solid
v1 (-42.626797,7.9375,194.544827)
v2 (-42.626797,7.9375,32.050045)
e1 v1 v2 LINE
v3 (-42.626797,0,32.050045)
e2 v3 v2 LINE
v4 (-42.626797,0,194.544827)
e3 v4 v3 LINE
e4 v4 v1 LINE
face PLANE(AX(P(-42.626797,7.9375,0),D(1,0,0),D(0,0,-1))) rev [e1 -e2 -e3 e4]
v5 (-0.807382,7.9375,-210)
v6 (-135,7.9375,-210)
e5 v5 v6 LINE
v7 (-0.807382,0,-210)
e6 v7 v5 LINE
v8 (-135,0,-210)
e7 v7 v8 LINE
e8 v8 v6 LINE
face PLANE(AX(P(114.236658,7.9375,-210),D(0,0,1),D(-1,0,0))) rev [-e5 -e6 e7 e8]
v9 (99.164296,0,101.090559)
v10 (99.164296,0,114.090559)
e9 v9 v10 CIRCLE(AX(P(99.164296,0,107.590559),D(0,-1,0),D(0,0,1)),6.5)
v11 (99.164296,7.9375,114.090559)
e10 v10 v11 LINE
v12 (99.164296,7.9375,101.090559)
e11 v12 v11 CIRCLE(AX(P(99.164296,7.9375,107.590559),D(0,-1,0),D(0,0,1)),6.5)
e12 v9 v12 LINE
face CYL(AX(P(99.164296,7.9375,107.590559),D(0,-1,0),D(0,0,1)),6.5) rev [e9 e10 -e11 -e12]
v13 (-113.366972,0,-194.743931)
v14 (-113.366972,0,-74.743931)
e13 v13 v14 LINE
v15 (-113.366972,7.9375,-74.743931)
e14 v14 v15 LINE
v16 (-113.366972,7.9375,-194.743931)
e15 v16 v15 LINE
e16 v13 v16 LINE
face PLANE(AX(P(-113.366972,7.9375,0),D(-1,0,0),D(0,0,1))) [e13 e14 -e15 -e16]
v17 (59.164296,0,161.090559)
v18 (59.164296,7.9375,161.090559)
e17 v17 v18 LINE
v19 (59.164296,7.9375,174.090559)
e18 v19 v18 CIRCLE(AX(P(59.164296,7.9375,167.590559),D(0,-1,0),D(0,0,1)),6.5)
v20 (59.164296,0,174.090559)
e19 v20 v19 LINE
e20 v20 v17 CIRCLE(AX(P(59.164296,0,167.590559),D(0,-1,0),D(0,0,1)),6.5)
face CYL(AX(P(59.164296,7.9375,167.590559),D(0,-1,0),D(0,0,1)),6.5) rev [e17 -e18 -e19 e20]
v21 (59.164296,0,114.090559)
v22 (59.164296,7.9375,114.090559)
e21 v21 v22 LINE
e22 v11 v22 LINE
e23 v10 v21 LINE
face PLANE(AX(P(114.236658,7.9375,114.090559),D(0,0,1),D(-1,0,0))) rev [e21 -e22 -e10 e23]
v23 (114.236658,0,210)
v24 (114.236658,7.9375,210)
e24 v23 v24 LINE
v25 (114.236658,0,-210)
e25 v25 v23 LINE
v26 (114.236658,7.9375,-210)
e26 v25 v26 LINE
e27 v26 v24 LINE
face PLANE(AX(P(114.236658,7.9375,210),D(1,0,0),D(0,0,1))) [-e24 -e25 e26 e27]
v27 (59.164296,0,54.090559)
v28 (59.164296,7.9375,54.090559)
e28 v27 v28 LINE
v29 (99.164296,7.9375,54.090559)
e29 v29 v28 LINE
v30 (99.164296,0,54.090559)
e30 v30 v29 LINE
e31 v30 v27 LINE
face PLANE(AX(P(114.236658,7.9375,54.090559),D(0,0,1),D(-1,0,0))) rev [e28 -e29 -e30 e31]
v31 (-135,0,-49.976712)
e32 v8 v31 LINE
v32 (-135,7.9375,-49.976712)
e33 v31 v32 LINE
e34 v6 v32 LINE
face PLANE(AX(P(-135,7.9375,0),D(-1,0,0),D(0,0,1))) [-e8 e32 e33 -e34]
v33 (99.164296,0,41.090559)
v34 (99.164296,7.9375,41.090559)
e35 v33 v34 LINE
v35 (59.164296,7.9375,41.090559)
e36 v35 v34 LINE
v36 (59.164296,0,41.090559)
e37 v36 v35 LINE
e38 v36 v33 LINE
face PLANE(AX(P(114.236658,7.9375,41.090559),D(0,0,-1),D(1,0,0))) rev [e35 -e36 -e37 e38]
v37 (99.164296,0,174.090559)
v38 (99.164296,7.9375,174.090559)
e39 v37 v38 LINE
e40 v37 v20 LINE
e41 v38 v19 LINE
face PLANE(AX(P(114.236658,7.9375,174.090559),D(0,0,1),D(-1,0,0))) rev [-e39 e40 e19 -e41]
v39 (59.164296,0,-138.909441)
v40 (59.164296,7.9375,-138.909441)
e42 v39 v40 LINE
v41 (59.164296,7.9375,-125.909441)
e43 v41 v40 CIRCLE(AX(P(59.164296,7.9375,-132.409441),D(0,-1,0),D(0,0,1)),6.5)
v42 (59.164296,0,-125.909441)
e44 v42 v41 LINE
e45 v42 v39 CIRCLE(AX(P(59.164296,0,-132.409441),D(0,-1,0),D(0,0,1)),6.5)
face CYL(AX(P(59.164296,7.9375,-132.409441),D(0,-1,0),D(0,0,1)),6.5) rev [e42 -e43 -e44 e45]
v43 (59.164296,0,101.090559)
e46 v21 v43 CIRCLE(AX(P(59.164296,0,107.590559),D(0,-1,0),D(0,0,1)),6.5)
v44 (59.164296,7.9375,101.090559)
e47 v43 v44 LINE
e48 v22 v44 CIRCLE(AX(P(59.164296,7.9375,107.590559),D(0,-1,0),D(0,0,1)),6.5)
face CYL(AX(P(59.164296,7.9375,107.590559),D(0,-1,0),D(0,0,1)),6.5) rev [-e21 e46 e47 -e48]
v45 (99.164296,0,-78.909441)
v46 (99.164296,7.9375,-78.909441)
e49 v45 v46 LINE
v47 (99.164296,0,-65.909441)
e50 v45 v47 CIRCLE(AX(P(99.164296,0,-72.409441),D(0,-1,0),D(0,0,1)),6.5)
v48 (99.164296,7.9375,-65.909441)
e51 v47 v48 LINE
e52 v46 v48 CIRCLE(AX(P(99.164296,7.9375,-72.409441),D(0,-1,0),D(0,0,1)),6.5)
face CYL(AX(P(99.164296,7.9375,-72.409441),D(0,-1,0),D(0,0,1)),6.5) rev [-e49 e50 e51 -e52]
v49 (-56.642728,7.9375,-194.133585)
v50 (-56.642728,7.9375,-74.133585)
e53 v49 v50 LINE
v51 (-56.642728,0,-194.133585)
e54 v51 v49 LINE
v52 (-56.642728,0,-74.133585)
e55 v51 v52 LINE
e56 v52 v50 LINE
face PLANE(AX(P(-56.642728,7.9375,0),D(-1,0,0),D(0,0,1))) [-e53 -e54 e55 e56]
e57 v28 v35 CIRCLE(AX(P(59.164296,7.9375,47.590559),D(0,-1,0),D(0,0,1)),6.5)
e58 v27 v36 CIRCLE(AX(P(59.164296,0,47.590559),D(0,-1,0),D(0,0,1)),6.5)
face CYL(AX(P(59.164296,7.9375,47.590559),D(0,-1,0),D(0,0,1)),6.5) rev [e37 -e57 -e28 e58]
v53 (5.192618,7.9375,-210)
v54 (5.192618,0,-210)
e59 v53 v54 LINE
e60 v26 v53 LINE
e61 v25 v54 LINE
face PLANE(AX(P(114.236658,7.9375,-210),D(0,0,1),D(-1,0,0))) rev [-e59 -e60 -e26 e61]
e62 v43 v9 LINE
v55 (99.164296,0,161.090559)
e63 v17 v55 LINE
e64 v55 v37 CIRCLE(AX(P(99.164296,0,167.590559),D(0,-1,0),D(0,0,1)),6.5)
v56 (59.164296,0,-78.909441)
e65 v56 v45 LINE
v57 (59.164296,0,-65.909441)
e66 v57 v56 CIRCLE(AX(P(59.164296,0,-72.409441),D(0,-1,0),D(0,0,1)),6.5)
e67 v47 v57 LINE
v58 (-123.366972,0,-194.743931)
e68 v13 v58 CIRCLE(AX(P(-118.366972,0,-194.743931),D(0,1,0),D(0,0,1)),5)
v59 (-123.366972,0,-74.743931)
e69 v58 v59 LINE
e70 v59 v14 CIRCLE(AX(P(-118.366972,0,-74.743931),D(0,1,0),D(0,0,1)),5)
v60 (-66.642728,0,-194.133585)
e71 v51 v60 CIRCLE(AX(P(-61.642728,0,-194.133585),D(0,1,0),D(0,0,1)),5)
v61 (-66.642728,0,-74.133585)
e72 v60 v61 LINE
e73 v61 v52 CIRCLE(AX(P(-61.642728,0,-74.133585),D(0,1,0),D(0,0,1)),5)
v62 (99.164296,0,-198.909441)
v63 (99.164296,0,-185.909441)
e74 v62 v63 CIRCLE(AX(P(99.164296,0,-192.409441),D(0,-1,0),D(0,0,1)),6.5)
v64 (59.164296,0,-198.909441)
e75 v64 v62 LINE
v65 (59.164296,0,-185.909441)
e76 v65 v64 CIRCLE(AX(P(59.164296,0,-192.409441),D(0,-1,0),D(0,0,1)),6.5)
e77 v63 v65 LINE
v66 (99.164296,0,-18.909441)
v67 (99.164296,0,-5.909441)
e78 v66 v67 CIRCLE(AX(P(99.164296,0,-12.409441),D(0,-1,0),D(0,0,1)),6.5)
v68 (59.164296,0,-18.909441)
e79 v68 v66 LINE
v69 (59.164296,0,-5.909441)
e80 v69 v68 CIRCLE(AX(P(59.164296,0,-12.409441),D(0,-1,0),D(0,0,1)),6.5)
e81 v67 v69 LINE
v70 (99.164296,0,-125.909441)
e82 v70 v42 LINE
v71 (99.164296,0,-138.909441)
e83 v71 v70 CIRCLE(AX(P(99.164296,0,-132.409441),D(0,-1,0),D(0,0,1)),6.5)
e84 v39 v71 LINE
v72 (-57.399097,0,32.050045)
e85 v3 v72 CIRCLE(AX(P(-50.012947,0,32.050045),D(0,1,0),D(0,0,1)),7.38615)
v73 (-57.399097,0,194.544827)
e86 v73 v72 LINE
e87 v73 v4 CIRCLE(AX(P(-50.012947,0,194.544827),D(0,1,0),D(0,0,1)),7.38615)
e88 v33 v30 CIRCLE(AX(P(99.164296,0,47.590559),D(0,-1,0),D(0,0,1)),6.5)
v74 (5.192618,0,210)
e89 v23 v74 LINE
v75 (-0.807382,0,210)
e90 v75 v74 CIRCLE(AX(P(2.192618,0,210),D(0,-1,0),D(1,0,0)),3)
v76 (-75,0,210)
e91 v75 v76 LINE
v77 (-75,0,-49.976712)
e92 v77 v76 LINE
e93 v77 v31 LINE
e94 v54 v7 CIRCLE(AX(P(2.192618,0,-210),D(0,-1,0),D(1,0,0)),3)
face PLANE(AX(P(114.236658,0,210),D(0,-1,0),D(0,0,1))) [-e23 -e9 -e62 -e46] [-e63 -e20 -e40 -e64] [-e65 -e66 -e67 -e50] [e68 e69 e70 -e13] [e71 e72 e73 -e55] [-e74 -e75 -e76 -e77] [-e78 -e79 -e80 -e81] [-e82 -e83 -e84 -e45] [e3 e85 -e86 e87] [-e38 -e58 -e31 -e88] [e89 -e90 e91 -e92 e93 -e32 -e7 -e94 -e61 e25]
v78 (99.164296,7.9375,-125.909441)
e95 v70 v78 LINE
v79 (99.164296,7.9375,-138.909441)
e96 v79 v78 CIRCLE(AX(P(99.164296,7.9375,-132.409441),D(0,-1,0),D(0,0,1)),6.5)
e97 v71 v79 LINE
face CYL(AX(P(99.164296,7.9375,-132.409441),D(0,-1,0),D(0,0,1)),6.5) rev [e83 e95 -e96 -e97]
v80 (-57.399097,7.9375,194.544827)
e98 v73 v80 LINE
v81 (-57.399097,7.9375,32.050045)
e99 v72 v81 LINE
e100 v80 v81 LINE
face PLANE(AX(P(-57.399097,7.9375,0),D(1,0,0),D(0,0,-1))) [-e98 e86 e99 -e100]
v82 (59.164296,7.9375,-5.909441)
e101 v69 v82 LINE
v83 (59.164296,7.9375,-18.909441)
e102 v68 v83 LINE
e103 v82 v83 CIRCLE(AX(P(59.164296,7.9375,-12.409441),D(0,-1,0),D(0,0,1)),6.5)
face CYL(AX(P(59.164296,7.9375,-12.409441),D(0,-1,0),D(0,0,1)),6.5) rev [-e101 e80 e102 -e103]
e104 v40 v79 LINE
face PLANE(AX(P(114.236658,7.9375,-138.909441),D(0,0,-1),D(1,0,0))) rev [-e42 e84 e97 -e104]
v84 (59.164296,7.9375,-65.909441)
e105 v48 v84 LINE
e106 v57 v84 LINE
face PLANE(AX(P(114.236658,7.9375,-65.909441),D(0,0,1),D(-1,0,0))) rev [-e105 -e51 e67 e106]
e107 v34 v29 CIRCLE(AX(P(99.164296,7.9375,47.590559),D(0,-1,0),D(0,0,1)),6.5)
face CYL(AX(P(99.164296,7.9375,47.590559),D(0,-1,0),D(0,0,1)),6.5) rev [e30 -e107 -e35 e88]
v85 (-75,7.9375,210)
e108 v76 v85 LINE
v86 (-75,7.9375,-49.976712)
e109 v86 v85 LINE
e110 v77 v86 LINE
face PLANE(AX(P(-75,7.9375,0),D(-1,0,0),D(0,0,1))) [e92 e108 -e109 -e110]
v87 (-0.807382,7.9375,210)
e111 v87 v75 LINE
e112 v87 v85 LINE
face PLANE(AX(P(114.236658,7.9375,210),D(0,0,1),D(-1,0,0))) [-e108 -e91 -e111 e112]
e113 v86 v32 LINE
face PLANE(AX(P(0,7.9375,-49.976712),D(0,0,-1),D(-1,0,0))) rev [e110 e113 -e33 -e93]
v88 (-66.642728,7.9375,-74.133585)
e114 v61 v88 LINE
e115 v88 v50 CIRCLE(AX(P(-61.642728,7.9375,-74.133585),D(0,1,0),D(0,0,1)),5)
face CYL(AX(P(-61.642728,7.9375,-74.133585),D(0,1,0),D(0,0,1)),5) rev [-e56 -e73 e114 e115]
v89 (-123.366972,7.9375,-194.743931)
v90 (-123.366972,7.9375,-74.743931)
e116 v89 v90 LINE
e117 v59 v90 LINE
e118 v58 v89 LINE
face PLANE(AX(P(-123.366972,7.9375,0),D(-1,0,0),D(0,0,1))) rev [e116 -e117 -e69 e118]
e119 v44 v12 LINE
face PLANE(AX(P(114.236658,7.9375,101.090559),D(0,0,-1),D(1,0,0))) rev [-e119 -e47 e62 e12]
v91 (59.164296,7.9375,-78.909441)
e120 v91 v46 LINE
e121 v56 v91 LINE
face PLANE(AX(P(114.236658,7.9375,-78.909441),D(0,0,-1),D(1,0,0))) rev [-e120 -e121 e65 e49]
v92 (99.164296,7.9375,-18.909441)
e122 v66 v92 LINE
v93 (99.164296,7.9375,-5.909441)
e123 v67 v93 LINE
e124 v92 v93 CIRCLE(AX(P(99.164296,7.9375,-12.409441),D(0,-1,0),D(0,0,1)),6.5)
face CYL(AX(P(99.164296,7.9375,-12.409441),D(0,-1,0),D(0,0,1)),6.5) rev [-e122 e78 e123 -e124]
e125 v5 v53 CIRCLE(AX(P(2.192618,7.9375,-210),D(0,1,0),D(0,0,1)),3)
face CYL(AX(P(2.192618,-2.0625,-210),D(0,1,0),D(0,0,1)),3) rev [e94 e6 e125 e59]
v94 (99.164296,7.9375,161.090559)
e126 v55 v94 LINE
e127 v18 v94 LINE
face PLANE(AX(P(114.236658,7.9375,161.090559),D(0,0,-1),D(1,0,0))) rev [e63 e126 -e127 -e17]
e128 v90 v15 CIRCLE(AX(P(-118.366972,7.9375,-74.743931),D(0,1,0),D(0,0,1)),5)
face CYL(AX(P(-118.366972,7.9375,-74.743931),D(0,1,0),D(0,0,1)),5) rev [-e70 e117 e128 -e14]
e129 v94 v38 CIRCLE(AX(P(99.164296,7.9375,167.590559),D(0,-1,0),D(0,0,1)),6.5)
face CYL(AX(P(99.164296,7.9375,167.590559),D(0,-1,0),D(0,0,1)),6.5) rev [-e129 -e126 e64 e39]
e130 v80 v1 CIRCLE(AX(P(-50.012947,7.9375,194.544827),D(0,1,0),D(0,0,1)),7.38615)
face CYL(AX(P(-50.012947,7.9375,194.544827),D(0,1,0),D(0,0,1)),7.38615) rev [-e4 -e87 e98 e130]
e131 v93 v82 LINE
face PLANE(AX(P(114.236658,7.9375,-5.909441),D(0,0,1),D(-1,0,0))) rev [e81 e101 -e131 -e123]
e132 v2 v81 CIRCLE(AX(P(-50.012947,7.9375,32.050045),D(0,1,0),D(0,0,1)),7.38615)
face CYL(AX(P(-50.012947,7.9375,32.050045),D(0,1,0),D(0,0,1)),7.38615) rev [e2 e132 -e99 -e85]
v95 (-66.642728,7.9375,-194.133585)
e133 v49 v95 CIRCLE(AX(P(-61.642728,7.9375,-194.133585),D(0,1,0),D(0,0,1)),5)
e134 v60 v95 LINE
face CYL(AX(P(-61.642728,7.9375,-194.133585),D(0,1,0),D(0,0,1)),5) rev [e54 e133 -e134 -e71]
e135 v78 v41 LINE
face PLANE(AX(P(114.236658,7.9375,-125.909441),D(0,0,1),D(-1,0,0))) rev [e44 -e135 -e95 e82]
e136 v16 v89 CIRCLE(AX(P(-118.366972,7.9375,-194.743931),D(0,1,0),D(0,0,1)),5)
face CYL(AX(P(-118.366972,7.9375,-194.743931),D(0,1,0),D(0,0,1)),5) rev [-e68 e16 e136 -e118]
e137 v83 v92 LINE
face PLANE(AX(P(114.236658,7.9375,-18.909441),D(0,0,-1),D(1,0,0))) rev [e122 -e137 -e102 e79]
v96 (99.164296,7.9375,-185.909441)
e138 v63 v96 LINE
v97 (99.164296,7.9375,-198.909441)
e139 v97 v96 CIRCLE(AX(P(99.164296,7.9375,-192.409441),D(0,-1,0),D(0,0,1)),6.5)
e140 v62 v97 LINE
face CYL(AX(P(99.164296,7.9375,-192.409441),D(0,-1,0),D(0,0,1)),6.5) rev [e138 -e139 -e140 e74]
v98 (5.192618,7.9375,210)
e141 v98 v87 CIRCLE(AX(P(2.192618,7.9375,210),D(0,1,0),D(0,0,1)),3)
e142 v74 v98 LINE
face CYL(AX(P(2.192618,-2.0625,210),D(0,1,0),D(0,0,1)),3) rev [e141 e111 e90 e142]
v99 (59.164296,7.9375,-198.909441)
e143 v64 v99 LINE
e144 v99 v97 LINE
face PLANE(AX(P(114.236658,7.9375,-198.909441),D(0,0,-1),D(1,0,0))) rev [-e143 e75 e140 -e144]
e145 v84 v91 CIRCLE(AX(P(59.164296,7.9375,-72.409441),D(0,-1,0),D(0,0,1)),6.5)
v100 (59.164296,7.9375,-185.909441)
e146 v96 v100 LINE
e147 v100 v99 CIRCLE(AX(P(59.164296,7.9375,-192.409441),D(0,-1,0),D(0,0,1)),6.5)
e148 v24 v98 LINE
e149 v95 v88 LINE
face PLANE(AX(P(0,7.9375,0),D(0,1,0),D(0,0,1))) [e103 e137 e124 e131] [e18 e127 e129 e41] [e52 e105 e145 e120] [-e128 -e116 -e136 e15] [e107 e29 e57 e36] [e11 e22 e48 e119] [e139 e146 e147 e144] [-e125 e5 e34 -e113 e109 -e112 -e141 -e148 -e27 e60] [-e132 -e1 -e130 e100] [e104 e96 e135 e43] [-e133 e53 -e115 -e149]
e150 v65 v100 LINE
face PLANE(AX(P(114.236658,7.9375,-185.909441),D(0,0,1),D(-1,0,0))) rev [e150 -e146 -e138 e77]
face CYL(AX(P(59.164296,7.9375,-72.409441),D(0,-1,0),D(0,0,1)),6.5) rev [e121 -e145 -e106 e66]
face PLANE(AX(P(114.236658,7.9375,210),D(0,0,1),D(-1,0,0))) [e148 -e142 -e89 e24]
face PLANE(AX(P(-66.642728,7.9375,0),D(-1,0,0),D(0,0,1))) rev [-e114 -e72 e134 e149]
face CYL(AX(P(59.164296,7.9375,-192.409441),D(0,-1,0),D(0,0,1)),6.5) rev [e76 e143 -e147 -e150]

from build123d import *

# Parameters (mm, degrees)
CROQUIS1_W                = 60
CROQUIS1_H                = 160.023288417
SALIENTE_EXTRUIR1_DEPTH   = 7.9375
CROQUIS2_W                = 8.086078182
CROQUIS2_H                = 420
SALIENTE_EXTRUIR2_DEPTH   = 110
CORTAR_EXTRUIR1_DEPTH     = 10
CROQUIS4_W                = 184.389639933
CROQUIS4_H                = 520.028204804
CORTAR_EXTRUIR2_DEPTH     = 10
CONVERTIR_S_LIDO1_START   = -210
CONVERTIR_S_LIDO1_DEPTH   = 420
CONVERTIR_S_LIDO1_2_DEPTH = 420
CORTAR_EXTRUIR3_START     = -117.9375
CORTAR_EXTRUIR3_OUTLINE_W = 14.086078182
CORTAR_EXTRUIR3_OUTLINE_H = 420
CORTAR_EXTRUIR3_DEPTH     = 110
CORTAR_EXTRUIR3_START_2   = -7.9375
CORTAR_EXTRUIR3_2_DEPTH   = 7.9375
CORTAR_EXTRUIR3_3_DEPTH   = 7.9375


# Read off the part's stored shape, not the designer's step: Convertir-Sólido1, Cortar-Extruir3
with BuildPart() as part:
    # Croquis1 → Saliente-Extruir1 (new body)
    # profile 1 of 2: a face of its own
    with BuildSketch(Plane(origin=(0, 0, 0), x_dir=(1, 0, 0), z_dir=(0, 1, 0))):
        Polygon((75, 210), (-75, 210), (-75, 49.976711583), (-75, -210), (75, -210), align=None)
        with BuildLine():
            Line((-57.399097033, -162.050045053), (-57.399097033, -64.544827159))
            Line((-57.399097033, -64.544827159), (-57.399097033, -32.050045053))
            ThreePointArc((-57.399097033, -32.050045053), (-50.012947046, -24.663895066), (-42.626797059, -32.050045053))
            Line((-42.626797059, -32.050045053), (-42.626797059, -64.544827159))
            Line((-42.626797059, -64.544827159), (-42.626797059, -162.050045053))
            Line((-42.626797059, -162.050045053), (-42.626797059, -194.544827159))
            ThreePointArc((-42.626797059, -194.544827159), (-50.012947046, -201.930977146), (-57.399097033, -194.544827159))
            Line((-57.399097033, -194.544827159), (-57.399097033, -162.050045053))
        make_face(mode=Mode.SUBTRACT)
        with BuildLine():
            ThreePointArc((57.373202941, -194.544827159), (49.987052954, -201.930977146), (42.600902967, -194.544827159))
            Line((42.600902967, -194.544827159), (42.600902967, -162.050045053))
            ThreePointArc((42.600902967, -162.050045053), (49.987052954, -154.663895066), (57.373202941, -162.050045053))
            Line((57.373202941, -162.050045053), (57.373202941, -194.544827159))
        make_face(mode=Mode.SUBTRACT)
        with BuildLine():
            ThreePointArc((57.373202941, -64.544827159), (49.987052954, -71.930977146), (42.600902967, -64.544827159))
            Line((42.600902967, -64.544827159), (42.600902967, -32.050045053))
            ThreePointArc((42.600902967, -32.050045053), (49.987052954, -24.663895066), (57.373202941, -32.050045053))
            Line((57.373202941, -32.050045053), (57.373202941, -64.544827159))
        make_face(mode=Mode.SUBTRACT)
        with BuildLine():
            ThreePointArc((-66.642728039, 194.133584854), (-61.642728039, 199.133584854), (-56.642728039, 194.133584854))
            Line((-56.642728039, 194.133584854), (-56.642728039, 74.133584854))
            ThreePointArc((-56.642728039, 74.133584854), (-61.642728039, 69.133584854), (-66.642728039, 74.133584854))
            Line((-66.642728039, 74.133584854), (-66.642728039, 194.133584854))
        make_face(mode=Mode.SUBTRACT)
    # profile 2 of 2: a face of its own
    with BuildSketch(Plane(origin=(0, 0, 0), x_dir=(1, 0, 0), z_dir=(0, 1, 0))):
        with Locations((-105, 129.988355791)):
            Rectangle(CROQUIS1_W, CROQUIS1_H)
        with BuildLine():
            ThreePointArc((-123.366972213, 194.743931483), (-118.366972213, 199.743931483), (-113.366972213, 194.743931483))
            Line((-113.366972213, 194.743931483), (-113.366972213, 74.743931483))
            ThreePointArc((-113.366972213, 74.743931483), (-118.366972213, 69.743931483), (-123.366972213, 74.743931483))
            Line((-123.366972213, 74.743931483), (-123.366972213, 194.743931483))
        make_face(mode=Mode.SUBTRACT)
    extrude(amount=SALIENTE_EXTRUIR1_DEPTH)

    # Croquis2 → Saliente-Extruir2 (add)
    with BuildSketch(Plane.XZ):
        with Locations((4.043039091, 0)):
            Rectangle(CROQUIS2_W, CROQUIS2_H)
    extrude(amount=SALIENTE_EXTRUIR2_DEPTH)

    # Croquis3 → Cortar-Extruir1 (cut)
    with BuildSketch(Plane.ZY):
        with BuildLine():
            Line((-185.90944112, -54.927638628), (-185.90944112, -94.927638628))
            ThreePointArc((-185.90944112, -94.927638628), (-192.40944112, -101.427638628), (-198.90944112, -94.927638628))
            Line((-198.90944112, -94.927638628), (-198.90944112, -54.927638628))
            ThreePointArc((-198.90944112, -54.927638628), (-192.40944112, -48.427638628), (-185.90944112, -54.927638628))
        make_face()
        with BuildLine():
            Line((-125.90944112, -54.927638628), (-125.90944112, -94.927638628))
            ThreePointArc((-125.90944112, -94.927638628), (-132.40944112, -101.427638628), (-138.90944112, -94.927638628))
            Line((-138.90944112, -94.927638628), (-138.90944112, -54.927638628))
            ThreePointArc((-138.90944112, -54.927638628), (-132.40944112, -48.427638628), (-125.90944112, -54.927638628))
        make_face()
        with BuildLine():
            Line((-65.90944112, -54.927638628), (-65.90944112, -94.927638628))
            ThreePointArc((-65.90944112, -94.927638628), (-72.40944112, -101.427638628), (-78.90944112, -94.927638628))
            Line((-78.90944112, -94.927638628), (-78.90944112, -54.927638628))
            ThreePointArc((-78.90944112, -54.927638628), (-72.40944112, -48.427638628), (-65.90944112, -54.927638628))
        make_face()
        with BuildLine():
            Line((-5.90944112, -54.927638628), (-5.90944112, -94.927638628))
            ThreePointArc((-5.90944112, -94.927638628), (-12.40944112, -101.427638628), (-18.90944112, -94.927638628))
            Line((-18.90944112, -94.927638628), (-18.90944112, -54.927638628))
            ThreePointArc((-18.90944112, -54.927638628), (-12.40944112, -48.427638628), (-5.90944112, -54.927638628))
        make_face()
        with BuildLine():
            Line((54.09055888, -54.927638628), (54.09055888, -94.927638628))
            ThreePointArc((54.09055888, -94.927638628), (47.59055888, -101.427638628), (41.09055888, -94.927638628))
            Line((41.09055888, -94.927638628), (41.09055888, -54.927638628))
            ThreePointArc((41.09055888, -54.927638628), (47.59055888, -48.427638628), (54.09055888, -54.927638628))
        make_face()
        with BuildLine():
            Line((114.09055888, -54.927638628), (114.09055888, -94.927638628))
            ThreePointArc((114.09055888, -94.927638628), (107.59055888, -101.427638628), (101.09055888, -94.927638628))
            Line((101.09055888, -94.927638628), (101.09055888, -54.927638628))
            ThreePointArc((101.09055888, -54.927638628), (107.59055888, -48.427638628), (114.09055888, -54.927638628))
        make_face()
        with BuildLine():
            Line((174.09055888, -54.927638628), (174.09055888, -94.927638628))
            ThreePointArc((174.09055888, -94.927638628), (167.59055888, -101.427638628), (161.09055888, -94.927638628))
            Line((161.09055888, -94.927638628), (161.09055888, -54.927638628))
            ThreePointArc((161.09055888, -54.927638628), (167.59055888, -48.427638628), (174.09055888, -54.927638628))
        make_face()
    extrude(amount=-CORTAR_EXTRUIR1_DEPTH, mode=Mode.SUBTRACT)

    # Croquis4 → Cortar-Extruir2 (cut)
    with BuildSketch(Plane.XZ):
        with Locations((100.280898149, 50.014102402)):
            Rectangle(CROQUIS4_W, CROQUIS4_H)
    extrude(amount=-CORTAR_EXTRUIR2_DEPTH, mode=Mode.SUBTRACT)

    # Convertir-Sólido1 outline → Convertir-Sólido1 (cut)
    with BuildSketch(Plane.XY.offset(CONVERTIR_S_LIDO1_START)):
        with BuildLine():
            Line((8.086078182, 7.9375), (-4.851421818, 7.9375))
            ThreePointArc((-4.851421818, 7.9375), (4.296772164, 4.148193982), (8.086078182, -5))
            Line((8.086078182, -5), (8.086078182, 7.9375))
        make_face()
        with BuildLine():
            Line((0, -110), (0.148578182, -110))
            Line((0.148578182, -110), (0.148578182, -5))
            ThreePointArc((0.148578182, -5), (0.11129463, -4.390536748), (0, -3.790162679))
            Line((0, -3.790162679), (0, -110))
        make_face()
    extrude(amount=CONVERTIR_S_LIDO1_DEPTH, mode=Mode.SUBTRACT)

    # Convertir-S_lido1 2 outline → Convertir-S_lido1 2 (add)
    with BuildSketch(Plane.XY.offset(CONVERTIR_S_LIDO1_START)):
        with BuildLine():
            ThreePointArc((-4.851421818, 0), (-1.773206962, -1.059873948), (0, -3.790162679))
            Line((0, -3.790162679), (0, 0))
            Line((0, 0), (-4.851421818, 0))
        make_face()
    extrude(amount=CONVERTIR_S_LIDO1_2_DEPTH)

    # Cortar-Extruir3 outline → Cortar-Extruir3 (cut)
    with BuildSketch(Plane(origin=(0, 7.9375, 0), x_dir=(1, 0, 0), z_dir=(0, 1, 0)).offset(CORTAR_EXTRUIR3_START)):
        with Locations((1.043039091, 0)):
            Rectangle(CORTAR_EXTRUIR3_OUTLINE_W, CORTAR_EXTRUIR3_OUTLINE_H)
    extrude(amount=CORTAR_EXTRUIR3_DEPTH, mode=Mode.SUBTRACT)

    # Cortar-Extruir3 2 outline → Cortar-Extruir3 2 (cut)
    with BuildSketch(Plane(origin=(0, 7.9375, 0), x_dir=(1, 0, 0), z_dir=(0, 1, 0)).offset(CORTAR_EXTRUIR3_START_2)):
        with BuildLine():
            Line((5.19261796, 210), (-0.80738204, 210))
            ThreePointArc((-0.80738204, 210), (2.19261796, 207), (5.19261796, 210))
        make_face()
        with BuildLine():
            Line((-0.80738204, -210), (5.19261796, -210))
            ThreePointArc((5.19261796, -210), (2.19261796, -207), (-0.80738204, -210))
        make_face()
    extrude(amount=CORTAR_EXTRUIR3_2_DEPTH, mode=Mode.SUBTRACT)

    # Cortar-Extruir3 3 outline → Cortar-Extruir3 3 (add)
    with BuildSketch(Plane(origin=(0, 7.9375, 0), x_dir=(1, 0, 0), z_dir=(0, 1, 0)).offset(CORTAR_EXTRUIR3_START_2)):
        with BuildLine():
            ThreePointArc((5.19261796, 210), (2.19261796, 207), (-0.80738204, 210))
            Line((-0.80738204, 210), (-6, 210))
            Line((-6, 210), (-6, -210))
            Line((-6, -210), (-0.80738204, -210))
            ThreePointArc((-0.80738204, -210), (2.19261796, -207), (5.19261796, -210))
            Line((5.19261796, -210), (114.236657738, -210))
            Line((114.236657738, -210), (114.236657738, 210))
            Line((114.236657738, 210), (5.19261796, 210))
        make_face()
        with BuildLine():
            Line((59.164296366, 198.90944112), (99.164296366, 198.90944112))
            ThreePointArc((99.164296366, 198.90944112), (105.664296366, 192.40944112), (99.164296366, 185.90944112))
            Line((99.164296366, 185.90944112), (59.164296366, 185.90944112))
            ThreePointArc((59.164296366, 185.90944112), (52.664296366, 192.40944112), (59.164296366, 198.90944112))
        make_face(mode=Mode.SUBTRACT)
        with BuildLine():
            Line((59.164296366, 138.90944112), (99.164296366, 138.90944112))
            ThreePointArc((99.164296366, 138.90944112), (105.664296366, 132.40944112), (99.164296366, 125.90944112))
            Line((99.164296366, 125.90944112), (59.164296366, 125.90944112))
            ThreePointArc((59.164296366, 125.90944112), (52.664296366, 132.40944112), (59.164296366, 138.90944112))
        make_face(mode=Mode.SUBTRACT)
        with BuildLine():
            Line((59.164296366, 78.90944112), (99.164296366, 78.90944112))
            ThreePointArc((99.164296366, 78.90944112), (105.664296366, 72.40944112), (99.164296366, 65.90944112))
            Line((99.164296366, 65.90944112), (59.164296366, 65.90944112))
            ThreePointArc((59.164296366, 65.90944112), (52.664296366, 72.40944112), (59.164296366, 78.90944112))
        make_face(mode=Mode.SUBTRACT)
        with BuildLine():
            Line((59.164296366, 18.90944112), (99.164296366, 18.90944112))
            ThreePointArc((99.164296366, 18.90944112), (105.664296366, 12.40944112), (99.164296366, 5.90944112))
            Line((99.164296366, 5.90944112), (59.164296366, 5.90944112))
            ThreePointArc((59.164296366, 5.90944112), (52.664296366, 12.40944112), (59.164296366, 18.90944112))
        make_face(mode=Mode.SUBTRACT)
        with BuildLine():
            Line((59.164296366, -41.09055888), (99.164296366, -41.09055888))
            ThreePointArc((99.164296366, -41.09055888), (105.664296366, -47.59055888), (99.164296366, -54.09055888))
            Line((99.164296366, -54.09055888), (59.164296366, -54.09055888))
            ThreePointArc((59.164296366, -54.09055888), (52.664296366, -47.59055888), (59.164296366, -41.09055888))
        make_face(mode=Mode.SUBTRACT)
        with BuildLine():
            Line((59.164296366, -101.09055888), (99.164296366, -101.09055888))
            ThreePointArc((99.164296366, -101.09055888), (105.664296366, -107.59055888), (99.164296366, -114.09055888))
            Line((99.164296366, -114.09055888), (59.164296366, -114.09055888))
            ThreePointArc((59.164296366, -114.09055888), (52.664296366, -107.59055888), (59.164296366, -101.09055888))
        make_face(mode=Mode.SUBTRACT)
        with BuildLine():
            Line((59.164296366, -161.09055888), (99.164296366, -161.09055888))
            ThreePointArc((99.164296366, -161.09055888), (105.664296366, -167.59055888), (99.164296366, -174.09055888))
            Line((99.164296366, -174.09055888), (59.164296366, -174.09055888))
            ThreePointArc((59.164296366, -174.09055888), (52.664296366, -167.59055888), (59.164296366, -161.09055888))
        make_face(mode=Mode.SUBTRACT)
    extrude(amount=CORTAR_EXTRUIR3_3_DEPTH)


solid = part.part
